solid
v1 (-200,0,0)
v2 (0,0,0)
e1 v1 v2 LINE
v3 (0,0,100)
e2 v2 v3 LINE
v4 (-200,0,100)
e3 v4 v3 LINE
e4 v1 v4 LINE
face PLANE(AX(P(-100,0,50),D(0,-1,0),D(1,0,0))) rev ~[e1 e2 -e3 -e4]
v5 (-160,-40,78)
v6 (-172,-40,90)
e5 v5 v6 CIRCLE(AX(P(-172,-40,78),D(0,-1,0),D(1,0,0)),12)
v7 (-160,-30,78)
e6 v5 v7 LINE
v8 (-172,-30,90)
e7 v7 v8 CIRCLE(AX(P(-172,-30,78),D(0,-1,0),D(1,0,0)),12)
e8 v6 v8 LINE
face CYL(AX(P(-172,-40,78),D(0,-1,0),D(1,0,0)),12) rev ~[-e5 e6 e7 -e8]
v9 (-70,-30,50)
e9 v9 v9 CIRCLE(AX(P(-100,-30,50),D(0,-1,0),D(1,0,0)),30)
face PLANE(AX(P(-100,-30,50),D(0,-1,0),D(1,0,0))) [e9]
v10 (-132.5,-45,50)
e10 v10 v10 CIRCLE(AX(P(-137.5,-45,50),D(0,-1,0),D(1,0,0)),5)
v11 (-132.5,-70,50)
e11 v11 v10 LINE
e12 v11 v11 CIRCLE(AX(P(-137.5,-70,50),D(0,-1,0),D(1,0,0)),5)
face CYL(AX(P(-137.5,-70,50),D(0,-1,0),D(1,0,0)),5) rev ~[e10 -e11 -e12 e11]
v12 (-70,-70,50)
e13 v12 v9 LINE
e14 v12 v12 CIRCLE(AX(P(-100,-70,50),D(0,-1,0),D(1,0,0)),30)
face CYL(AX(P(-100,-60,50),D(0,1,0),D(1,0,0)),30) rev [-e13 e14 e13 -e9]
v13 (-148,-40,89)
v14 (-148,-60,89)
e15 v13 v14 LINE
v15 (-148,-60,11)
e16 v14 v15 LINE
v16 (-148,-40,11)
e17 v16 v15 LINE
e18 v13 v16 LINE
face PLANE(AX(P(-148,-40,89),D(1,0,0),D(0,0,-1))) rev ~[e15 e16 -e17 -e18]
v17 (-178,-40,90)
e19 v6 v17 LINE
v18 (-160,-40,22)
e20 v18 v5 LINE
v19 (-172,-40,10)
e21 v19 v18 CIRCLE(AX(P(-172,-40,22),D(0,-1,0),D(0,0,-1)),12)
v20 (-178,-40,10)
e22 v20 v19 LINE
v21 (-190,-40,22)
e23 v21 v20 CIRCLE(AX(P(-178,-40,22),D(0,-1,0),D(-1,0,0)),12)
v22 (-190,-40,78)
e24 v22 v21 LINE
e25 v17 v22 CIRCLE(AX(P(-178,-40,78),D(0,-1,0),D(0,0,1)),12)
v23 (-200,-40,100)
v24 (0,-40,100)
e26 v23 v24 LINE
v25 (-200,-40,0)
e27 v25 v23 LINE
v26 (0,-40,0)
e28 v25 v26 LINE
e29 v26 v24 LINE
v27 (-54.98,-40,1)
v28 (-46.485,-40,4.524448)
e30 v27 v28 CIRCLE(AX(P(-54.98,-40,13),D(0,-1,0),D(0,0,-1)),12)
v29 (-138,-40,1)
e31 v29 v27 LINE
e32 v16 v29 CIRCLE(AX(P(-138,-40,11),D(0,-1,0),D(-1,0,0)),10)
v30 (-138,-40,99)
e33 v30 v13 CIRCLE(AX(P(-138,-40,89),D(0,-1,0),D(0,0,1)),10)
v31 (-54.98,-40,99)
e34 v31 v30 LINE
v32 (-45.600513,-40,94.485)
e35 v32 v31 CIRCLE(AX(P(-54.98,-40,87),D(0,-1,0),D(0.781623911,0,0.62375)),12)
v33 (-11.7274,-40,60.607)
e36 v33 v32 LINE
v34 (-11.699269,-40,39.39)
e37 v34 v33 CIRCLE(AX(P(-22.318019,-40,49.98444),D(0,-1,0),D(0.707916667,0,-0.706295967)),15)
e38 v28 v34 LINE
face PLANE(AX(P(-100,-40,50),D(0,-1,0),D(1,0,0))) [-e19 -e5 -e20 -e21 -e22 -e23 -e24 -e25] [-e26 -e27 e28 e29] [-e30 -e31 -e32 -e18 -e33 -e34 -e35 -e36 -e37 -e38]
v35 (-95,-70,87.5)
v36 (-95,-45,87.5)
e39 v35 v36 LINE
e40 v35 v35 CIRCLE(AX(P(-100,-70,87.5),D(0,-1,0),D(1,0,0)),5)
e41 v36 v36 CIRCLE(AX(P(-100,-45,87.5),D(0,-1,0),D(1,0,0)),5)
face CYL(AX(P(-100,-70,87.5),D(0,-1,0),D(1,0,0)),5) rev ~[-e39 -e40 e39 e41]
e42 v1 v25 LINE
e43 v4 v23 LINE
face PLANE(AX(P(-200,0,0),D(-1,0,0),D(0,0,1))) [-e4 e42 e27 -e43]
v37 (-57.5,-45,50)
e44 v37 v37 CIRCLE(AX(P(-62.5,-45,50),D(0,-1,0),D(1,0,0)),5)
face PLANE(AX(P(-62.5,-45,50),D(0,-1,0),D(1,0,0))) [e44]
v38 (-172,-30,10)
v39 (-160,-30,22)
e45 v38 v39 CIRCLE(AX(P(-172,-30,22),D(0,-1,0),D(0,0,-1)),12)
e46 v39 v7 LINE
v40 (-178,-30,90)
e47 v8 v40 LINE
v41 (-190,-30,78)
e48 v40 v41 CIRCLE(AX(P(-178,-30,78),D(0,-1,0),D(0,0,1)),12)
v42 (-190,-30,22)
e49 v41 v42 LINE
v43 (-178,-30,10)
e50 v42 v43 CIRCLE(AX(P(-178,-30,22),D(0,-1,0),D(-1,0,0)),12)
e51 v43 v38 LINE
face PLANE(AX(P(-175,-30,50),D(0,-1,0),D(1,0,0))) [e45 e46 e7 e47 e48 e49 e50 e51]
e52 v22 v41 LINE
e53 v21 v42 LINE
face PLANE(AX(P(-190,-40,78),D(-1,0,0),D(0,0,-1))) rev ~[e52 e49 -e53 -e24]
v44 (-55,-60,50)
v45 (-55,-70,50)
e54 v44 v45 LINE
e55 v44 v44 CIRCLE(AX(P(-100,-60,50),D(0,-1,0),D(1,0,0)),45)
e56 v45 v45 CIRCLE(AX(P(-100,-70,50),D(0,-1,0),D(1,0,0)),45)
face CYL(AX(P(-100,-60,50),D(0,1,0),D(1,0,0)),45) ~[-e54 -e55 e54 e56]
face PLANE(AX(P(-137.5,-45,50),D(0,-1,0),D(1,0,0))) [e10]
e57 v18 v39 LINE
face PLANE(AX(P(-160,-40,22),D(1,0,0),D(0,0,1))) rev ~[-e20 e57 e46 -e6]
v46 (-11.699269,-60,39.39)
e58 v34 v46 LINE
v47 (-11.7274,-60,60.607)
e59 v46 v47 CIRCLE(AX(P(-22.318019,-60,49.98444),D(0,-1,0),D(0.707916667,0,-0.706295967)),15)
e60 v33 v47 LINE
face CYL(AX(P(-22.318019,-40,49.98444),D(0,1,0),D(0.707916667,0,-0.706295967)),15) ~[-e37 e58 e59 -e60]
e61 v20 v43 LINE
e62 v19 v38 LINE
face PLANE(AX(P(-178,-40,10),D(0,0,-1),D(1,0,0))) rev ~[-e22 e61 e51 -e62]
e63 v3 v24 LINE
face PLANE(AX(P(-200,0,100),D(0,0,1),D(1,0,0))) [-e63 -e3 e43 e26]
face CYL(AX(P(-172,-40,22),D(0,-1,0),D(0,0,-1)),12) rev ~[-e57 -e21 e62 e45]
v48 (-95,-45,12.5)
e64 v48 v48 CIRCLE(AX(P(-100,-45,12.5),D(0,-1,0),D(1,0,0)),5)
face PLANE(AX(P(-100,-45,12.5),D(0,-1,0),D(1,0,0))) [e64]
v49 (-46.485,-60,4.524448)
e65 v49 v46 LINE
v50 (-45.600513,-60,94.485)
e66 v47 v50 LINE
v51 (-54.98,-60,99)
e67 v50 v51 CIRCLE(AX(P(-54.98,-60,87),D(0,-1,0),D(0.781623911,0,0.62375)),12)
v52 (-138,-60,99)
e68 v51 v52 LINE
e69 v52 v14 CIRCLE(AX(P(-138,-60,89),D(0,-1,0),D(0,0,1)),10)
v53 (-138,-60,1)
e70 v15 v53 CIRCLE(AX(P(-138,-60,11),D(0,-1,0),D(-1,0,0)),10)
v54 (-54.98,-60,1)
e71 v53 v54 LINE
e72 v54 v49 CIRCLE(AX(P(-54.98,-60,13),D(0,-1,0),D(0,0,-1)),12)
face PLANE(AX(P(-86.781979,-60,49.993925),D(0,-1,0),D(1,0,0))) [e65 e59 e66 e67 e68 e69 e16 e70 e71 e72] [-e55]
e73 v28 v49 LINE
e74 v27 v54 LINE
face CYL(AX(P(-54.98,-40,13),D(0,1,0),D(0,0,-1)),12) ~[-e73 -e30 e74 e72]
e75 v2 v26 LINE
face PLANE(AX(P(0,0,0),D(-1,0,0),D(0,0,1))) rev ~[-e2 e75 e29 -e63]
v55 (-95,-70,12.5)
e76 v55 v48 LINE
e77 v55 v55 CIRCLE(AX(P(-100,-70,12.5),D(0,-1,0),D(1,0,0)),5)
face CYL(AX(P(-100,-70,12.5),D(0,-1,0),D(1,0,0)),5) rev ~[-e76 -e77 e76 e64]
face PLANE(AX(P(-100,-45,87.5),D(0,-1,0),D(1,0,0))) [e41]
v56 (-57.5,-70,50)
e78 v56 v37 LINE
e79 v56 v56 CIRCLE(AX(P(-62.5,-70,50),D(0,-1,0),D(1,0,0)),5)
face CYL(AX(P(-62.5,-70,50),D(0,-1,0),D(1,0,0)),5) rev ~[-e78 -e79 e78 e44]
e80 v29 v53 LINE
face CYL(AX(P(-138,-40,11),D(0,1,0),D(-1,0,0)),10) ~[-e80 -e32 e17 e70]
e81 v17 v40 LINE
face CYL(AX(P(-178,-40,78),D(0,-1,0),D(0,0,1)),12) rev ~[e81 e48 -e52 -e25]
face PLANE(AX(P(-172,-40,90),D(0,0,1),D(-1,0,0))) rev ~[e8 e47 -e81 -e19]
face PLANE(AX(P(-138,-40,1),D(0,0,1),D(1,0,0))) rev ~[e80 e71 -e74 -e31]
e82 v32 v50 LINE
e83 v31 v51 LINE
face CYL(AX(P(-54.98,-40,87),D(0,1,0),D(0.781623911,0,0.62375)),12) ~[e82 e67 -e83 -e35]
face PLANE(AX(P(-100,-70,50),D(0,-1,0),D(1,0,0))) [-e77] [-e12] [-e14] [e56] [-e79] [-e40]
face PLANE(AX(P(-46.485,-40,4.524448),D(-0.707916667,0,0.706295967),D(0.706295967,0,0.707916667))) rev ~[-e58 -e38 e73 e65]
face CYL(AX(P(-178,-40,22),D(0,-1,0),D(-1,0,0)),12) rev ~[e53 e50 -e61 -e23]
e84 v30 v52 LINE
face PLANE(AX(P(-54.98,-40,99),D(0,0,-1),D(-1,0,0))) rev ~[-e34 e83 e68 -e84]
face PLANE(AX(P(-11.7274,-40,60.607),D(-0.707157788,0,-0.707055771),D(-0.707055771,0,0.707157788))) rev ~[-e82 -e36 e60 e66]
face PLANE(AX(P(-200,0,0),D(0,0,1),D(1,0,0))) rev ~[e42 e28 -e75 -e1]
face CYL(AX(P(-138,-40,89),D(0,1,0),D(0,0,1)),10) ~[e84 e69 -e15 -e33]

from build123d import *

# Parameters (mm, degrees)
F0_W     = 200
F0_H     = 100
F1_DEPTH = 40
F2_R     = 30
F3_DEPTH = 10
F4_R     = 30
F5_DEPTH = 20
F6_R     = 45
F6_R_2   = 30
F7_DEPTH = 10
F8_R     = 5
F9_DEPTH = 25


with BuildPart() as f1:
    # F0 (on Front) → F1 (new body)
    with BuildSketch(Plane.XZ):
        with Locations((-100, 50)):
            Rectangle(F0_W, F0_H)
    extrude(amount=F1_DEPTH)

    # F2 (on face) → F3 (cut)
    with BuildSketch(Plane.XZ.offset(40)):
        with BuildLine():
            Line((-172, 90), (-178, 90))
            ThreePointArc((-178, 90), (-186.4852813742, 86.4852813742), (-190, 78))
            Line((-190, 78), (-190, 22))
            ThreePointArc((-190, 22), (-186.4852813742, 13.5147186258), (-178, 10))
            Line((-178, 10), (-172, 10))
            ThreePointArc((-172, 10), (-163.5147186258, 13.5147186258), (-160, 22))
            Line((-160, 22), (-160, 78))
            ThreePointArc((-160, 78), (-163.5147186258, 86.4852813742), (-172, 90))
        make_face()
        with Locations((-100, 50)):
            Circle(F2_R)
    extrude(amount=-F3_DEPTH, mode=Mode.SUBTRACT)

    # F4 (on face) → F5 (join)
    with BuildSketch(Plane.XZ.offset(40)):
        with BuildLine():
            ThreePointArc((-138, 99), (-145.0710678119, 96.0710678119), (-148, 89))
            Line((-148, 89), (-148, 11))
            ThreePointArc((-148, 11), (-145.0710678119, 3.9289321881), (-138, 1))
            Line((-138, 1), (-54.98, 1))
            ThreePointArc((-54.98, 1), (-50.3814469261, 1.9160787793), (-46.485, 4.5244483955))
            Line((-46.485, 4.5244483955), (-11.6992693535, 39.39))
            ThreePointArc((-11.6992693535, 39.39), (-7.3180325381, 50.004327625), (-11.7274004602, 60.607))
            Line((-11.7274004602, 60.607), (-45.6005130737, 94.485))
            ThreePointArc((-45.6005130737, 94.485), (-49.7751945281, 97.8124927746), (-54.98, 99))
            Line((-54.98, 99), (-138, 99))
        make_face()
        with Locations((-100, 50)):
            Circle(F4_R, mode=Mode.SUBTRACT)
    extrude(amount=F5_DEPTH)

    # F6 (on face) → F7 (join)
    with BuildSketch(Plane.XZ.offset(60)):
        with Locations((-100, 50)):
            Circle(F6_R)
        with Locations((-100, 50)):
            Circle(F6_R_2, mode=Mode.SUBTRACT)
    extrude(amount=F7_DEPTH)

    # F8 (on face) → F9 (cut)
    with BuildSketch(Plane.XZ.offset(70)):
        with Locations((-100, 87.5)):
            Circle(F8_R)
        with Locations((-137.5, 50)):
            Circle(F8_R)
        with Locations((-100, 12.5)):
            Circle(F8_R)
        with Locations((-62.5, 50)):
            Circle(F8_R)
    extrude(amount=-F9_DEPTH, mode=Mode.SUBTRACT)


solid = f1.part
